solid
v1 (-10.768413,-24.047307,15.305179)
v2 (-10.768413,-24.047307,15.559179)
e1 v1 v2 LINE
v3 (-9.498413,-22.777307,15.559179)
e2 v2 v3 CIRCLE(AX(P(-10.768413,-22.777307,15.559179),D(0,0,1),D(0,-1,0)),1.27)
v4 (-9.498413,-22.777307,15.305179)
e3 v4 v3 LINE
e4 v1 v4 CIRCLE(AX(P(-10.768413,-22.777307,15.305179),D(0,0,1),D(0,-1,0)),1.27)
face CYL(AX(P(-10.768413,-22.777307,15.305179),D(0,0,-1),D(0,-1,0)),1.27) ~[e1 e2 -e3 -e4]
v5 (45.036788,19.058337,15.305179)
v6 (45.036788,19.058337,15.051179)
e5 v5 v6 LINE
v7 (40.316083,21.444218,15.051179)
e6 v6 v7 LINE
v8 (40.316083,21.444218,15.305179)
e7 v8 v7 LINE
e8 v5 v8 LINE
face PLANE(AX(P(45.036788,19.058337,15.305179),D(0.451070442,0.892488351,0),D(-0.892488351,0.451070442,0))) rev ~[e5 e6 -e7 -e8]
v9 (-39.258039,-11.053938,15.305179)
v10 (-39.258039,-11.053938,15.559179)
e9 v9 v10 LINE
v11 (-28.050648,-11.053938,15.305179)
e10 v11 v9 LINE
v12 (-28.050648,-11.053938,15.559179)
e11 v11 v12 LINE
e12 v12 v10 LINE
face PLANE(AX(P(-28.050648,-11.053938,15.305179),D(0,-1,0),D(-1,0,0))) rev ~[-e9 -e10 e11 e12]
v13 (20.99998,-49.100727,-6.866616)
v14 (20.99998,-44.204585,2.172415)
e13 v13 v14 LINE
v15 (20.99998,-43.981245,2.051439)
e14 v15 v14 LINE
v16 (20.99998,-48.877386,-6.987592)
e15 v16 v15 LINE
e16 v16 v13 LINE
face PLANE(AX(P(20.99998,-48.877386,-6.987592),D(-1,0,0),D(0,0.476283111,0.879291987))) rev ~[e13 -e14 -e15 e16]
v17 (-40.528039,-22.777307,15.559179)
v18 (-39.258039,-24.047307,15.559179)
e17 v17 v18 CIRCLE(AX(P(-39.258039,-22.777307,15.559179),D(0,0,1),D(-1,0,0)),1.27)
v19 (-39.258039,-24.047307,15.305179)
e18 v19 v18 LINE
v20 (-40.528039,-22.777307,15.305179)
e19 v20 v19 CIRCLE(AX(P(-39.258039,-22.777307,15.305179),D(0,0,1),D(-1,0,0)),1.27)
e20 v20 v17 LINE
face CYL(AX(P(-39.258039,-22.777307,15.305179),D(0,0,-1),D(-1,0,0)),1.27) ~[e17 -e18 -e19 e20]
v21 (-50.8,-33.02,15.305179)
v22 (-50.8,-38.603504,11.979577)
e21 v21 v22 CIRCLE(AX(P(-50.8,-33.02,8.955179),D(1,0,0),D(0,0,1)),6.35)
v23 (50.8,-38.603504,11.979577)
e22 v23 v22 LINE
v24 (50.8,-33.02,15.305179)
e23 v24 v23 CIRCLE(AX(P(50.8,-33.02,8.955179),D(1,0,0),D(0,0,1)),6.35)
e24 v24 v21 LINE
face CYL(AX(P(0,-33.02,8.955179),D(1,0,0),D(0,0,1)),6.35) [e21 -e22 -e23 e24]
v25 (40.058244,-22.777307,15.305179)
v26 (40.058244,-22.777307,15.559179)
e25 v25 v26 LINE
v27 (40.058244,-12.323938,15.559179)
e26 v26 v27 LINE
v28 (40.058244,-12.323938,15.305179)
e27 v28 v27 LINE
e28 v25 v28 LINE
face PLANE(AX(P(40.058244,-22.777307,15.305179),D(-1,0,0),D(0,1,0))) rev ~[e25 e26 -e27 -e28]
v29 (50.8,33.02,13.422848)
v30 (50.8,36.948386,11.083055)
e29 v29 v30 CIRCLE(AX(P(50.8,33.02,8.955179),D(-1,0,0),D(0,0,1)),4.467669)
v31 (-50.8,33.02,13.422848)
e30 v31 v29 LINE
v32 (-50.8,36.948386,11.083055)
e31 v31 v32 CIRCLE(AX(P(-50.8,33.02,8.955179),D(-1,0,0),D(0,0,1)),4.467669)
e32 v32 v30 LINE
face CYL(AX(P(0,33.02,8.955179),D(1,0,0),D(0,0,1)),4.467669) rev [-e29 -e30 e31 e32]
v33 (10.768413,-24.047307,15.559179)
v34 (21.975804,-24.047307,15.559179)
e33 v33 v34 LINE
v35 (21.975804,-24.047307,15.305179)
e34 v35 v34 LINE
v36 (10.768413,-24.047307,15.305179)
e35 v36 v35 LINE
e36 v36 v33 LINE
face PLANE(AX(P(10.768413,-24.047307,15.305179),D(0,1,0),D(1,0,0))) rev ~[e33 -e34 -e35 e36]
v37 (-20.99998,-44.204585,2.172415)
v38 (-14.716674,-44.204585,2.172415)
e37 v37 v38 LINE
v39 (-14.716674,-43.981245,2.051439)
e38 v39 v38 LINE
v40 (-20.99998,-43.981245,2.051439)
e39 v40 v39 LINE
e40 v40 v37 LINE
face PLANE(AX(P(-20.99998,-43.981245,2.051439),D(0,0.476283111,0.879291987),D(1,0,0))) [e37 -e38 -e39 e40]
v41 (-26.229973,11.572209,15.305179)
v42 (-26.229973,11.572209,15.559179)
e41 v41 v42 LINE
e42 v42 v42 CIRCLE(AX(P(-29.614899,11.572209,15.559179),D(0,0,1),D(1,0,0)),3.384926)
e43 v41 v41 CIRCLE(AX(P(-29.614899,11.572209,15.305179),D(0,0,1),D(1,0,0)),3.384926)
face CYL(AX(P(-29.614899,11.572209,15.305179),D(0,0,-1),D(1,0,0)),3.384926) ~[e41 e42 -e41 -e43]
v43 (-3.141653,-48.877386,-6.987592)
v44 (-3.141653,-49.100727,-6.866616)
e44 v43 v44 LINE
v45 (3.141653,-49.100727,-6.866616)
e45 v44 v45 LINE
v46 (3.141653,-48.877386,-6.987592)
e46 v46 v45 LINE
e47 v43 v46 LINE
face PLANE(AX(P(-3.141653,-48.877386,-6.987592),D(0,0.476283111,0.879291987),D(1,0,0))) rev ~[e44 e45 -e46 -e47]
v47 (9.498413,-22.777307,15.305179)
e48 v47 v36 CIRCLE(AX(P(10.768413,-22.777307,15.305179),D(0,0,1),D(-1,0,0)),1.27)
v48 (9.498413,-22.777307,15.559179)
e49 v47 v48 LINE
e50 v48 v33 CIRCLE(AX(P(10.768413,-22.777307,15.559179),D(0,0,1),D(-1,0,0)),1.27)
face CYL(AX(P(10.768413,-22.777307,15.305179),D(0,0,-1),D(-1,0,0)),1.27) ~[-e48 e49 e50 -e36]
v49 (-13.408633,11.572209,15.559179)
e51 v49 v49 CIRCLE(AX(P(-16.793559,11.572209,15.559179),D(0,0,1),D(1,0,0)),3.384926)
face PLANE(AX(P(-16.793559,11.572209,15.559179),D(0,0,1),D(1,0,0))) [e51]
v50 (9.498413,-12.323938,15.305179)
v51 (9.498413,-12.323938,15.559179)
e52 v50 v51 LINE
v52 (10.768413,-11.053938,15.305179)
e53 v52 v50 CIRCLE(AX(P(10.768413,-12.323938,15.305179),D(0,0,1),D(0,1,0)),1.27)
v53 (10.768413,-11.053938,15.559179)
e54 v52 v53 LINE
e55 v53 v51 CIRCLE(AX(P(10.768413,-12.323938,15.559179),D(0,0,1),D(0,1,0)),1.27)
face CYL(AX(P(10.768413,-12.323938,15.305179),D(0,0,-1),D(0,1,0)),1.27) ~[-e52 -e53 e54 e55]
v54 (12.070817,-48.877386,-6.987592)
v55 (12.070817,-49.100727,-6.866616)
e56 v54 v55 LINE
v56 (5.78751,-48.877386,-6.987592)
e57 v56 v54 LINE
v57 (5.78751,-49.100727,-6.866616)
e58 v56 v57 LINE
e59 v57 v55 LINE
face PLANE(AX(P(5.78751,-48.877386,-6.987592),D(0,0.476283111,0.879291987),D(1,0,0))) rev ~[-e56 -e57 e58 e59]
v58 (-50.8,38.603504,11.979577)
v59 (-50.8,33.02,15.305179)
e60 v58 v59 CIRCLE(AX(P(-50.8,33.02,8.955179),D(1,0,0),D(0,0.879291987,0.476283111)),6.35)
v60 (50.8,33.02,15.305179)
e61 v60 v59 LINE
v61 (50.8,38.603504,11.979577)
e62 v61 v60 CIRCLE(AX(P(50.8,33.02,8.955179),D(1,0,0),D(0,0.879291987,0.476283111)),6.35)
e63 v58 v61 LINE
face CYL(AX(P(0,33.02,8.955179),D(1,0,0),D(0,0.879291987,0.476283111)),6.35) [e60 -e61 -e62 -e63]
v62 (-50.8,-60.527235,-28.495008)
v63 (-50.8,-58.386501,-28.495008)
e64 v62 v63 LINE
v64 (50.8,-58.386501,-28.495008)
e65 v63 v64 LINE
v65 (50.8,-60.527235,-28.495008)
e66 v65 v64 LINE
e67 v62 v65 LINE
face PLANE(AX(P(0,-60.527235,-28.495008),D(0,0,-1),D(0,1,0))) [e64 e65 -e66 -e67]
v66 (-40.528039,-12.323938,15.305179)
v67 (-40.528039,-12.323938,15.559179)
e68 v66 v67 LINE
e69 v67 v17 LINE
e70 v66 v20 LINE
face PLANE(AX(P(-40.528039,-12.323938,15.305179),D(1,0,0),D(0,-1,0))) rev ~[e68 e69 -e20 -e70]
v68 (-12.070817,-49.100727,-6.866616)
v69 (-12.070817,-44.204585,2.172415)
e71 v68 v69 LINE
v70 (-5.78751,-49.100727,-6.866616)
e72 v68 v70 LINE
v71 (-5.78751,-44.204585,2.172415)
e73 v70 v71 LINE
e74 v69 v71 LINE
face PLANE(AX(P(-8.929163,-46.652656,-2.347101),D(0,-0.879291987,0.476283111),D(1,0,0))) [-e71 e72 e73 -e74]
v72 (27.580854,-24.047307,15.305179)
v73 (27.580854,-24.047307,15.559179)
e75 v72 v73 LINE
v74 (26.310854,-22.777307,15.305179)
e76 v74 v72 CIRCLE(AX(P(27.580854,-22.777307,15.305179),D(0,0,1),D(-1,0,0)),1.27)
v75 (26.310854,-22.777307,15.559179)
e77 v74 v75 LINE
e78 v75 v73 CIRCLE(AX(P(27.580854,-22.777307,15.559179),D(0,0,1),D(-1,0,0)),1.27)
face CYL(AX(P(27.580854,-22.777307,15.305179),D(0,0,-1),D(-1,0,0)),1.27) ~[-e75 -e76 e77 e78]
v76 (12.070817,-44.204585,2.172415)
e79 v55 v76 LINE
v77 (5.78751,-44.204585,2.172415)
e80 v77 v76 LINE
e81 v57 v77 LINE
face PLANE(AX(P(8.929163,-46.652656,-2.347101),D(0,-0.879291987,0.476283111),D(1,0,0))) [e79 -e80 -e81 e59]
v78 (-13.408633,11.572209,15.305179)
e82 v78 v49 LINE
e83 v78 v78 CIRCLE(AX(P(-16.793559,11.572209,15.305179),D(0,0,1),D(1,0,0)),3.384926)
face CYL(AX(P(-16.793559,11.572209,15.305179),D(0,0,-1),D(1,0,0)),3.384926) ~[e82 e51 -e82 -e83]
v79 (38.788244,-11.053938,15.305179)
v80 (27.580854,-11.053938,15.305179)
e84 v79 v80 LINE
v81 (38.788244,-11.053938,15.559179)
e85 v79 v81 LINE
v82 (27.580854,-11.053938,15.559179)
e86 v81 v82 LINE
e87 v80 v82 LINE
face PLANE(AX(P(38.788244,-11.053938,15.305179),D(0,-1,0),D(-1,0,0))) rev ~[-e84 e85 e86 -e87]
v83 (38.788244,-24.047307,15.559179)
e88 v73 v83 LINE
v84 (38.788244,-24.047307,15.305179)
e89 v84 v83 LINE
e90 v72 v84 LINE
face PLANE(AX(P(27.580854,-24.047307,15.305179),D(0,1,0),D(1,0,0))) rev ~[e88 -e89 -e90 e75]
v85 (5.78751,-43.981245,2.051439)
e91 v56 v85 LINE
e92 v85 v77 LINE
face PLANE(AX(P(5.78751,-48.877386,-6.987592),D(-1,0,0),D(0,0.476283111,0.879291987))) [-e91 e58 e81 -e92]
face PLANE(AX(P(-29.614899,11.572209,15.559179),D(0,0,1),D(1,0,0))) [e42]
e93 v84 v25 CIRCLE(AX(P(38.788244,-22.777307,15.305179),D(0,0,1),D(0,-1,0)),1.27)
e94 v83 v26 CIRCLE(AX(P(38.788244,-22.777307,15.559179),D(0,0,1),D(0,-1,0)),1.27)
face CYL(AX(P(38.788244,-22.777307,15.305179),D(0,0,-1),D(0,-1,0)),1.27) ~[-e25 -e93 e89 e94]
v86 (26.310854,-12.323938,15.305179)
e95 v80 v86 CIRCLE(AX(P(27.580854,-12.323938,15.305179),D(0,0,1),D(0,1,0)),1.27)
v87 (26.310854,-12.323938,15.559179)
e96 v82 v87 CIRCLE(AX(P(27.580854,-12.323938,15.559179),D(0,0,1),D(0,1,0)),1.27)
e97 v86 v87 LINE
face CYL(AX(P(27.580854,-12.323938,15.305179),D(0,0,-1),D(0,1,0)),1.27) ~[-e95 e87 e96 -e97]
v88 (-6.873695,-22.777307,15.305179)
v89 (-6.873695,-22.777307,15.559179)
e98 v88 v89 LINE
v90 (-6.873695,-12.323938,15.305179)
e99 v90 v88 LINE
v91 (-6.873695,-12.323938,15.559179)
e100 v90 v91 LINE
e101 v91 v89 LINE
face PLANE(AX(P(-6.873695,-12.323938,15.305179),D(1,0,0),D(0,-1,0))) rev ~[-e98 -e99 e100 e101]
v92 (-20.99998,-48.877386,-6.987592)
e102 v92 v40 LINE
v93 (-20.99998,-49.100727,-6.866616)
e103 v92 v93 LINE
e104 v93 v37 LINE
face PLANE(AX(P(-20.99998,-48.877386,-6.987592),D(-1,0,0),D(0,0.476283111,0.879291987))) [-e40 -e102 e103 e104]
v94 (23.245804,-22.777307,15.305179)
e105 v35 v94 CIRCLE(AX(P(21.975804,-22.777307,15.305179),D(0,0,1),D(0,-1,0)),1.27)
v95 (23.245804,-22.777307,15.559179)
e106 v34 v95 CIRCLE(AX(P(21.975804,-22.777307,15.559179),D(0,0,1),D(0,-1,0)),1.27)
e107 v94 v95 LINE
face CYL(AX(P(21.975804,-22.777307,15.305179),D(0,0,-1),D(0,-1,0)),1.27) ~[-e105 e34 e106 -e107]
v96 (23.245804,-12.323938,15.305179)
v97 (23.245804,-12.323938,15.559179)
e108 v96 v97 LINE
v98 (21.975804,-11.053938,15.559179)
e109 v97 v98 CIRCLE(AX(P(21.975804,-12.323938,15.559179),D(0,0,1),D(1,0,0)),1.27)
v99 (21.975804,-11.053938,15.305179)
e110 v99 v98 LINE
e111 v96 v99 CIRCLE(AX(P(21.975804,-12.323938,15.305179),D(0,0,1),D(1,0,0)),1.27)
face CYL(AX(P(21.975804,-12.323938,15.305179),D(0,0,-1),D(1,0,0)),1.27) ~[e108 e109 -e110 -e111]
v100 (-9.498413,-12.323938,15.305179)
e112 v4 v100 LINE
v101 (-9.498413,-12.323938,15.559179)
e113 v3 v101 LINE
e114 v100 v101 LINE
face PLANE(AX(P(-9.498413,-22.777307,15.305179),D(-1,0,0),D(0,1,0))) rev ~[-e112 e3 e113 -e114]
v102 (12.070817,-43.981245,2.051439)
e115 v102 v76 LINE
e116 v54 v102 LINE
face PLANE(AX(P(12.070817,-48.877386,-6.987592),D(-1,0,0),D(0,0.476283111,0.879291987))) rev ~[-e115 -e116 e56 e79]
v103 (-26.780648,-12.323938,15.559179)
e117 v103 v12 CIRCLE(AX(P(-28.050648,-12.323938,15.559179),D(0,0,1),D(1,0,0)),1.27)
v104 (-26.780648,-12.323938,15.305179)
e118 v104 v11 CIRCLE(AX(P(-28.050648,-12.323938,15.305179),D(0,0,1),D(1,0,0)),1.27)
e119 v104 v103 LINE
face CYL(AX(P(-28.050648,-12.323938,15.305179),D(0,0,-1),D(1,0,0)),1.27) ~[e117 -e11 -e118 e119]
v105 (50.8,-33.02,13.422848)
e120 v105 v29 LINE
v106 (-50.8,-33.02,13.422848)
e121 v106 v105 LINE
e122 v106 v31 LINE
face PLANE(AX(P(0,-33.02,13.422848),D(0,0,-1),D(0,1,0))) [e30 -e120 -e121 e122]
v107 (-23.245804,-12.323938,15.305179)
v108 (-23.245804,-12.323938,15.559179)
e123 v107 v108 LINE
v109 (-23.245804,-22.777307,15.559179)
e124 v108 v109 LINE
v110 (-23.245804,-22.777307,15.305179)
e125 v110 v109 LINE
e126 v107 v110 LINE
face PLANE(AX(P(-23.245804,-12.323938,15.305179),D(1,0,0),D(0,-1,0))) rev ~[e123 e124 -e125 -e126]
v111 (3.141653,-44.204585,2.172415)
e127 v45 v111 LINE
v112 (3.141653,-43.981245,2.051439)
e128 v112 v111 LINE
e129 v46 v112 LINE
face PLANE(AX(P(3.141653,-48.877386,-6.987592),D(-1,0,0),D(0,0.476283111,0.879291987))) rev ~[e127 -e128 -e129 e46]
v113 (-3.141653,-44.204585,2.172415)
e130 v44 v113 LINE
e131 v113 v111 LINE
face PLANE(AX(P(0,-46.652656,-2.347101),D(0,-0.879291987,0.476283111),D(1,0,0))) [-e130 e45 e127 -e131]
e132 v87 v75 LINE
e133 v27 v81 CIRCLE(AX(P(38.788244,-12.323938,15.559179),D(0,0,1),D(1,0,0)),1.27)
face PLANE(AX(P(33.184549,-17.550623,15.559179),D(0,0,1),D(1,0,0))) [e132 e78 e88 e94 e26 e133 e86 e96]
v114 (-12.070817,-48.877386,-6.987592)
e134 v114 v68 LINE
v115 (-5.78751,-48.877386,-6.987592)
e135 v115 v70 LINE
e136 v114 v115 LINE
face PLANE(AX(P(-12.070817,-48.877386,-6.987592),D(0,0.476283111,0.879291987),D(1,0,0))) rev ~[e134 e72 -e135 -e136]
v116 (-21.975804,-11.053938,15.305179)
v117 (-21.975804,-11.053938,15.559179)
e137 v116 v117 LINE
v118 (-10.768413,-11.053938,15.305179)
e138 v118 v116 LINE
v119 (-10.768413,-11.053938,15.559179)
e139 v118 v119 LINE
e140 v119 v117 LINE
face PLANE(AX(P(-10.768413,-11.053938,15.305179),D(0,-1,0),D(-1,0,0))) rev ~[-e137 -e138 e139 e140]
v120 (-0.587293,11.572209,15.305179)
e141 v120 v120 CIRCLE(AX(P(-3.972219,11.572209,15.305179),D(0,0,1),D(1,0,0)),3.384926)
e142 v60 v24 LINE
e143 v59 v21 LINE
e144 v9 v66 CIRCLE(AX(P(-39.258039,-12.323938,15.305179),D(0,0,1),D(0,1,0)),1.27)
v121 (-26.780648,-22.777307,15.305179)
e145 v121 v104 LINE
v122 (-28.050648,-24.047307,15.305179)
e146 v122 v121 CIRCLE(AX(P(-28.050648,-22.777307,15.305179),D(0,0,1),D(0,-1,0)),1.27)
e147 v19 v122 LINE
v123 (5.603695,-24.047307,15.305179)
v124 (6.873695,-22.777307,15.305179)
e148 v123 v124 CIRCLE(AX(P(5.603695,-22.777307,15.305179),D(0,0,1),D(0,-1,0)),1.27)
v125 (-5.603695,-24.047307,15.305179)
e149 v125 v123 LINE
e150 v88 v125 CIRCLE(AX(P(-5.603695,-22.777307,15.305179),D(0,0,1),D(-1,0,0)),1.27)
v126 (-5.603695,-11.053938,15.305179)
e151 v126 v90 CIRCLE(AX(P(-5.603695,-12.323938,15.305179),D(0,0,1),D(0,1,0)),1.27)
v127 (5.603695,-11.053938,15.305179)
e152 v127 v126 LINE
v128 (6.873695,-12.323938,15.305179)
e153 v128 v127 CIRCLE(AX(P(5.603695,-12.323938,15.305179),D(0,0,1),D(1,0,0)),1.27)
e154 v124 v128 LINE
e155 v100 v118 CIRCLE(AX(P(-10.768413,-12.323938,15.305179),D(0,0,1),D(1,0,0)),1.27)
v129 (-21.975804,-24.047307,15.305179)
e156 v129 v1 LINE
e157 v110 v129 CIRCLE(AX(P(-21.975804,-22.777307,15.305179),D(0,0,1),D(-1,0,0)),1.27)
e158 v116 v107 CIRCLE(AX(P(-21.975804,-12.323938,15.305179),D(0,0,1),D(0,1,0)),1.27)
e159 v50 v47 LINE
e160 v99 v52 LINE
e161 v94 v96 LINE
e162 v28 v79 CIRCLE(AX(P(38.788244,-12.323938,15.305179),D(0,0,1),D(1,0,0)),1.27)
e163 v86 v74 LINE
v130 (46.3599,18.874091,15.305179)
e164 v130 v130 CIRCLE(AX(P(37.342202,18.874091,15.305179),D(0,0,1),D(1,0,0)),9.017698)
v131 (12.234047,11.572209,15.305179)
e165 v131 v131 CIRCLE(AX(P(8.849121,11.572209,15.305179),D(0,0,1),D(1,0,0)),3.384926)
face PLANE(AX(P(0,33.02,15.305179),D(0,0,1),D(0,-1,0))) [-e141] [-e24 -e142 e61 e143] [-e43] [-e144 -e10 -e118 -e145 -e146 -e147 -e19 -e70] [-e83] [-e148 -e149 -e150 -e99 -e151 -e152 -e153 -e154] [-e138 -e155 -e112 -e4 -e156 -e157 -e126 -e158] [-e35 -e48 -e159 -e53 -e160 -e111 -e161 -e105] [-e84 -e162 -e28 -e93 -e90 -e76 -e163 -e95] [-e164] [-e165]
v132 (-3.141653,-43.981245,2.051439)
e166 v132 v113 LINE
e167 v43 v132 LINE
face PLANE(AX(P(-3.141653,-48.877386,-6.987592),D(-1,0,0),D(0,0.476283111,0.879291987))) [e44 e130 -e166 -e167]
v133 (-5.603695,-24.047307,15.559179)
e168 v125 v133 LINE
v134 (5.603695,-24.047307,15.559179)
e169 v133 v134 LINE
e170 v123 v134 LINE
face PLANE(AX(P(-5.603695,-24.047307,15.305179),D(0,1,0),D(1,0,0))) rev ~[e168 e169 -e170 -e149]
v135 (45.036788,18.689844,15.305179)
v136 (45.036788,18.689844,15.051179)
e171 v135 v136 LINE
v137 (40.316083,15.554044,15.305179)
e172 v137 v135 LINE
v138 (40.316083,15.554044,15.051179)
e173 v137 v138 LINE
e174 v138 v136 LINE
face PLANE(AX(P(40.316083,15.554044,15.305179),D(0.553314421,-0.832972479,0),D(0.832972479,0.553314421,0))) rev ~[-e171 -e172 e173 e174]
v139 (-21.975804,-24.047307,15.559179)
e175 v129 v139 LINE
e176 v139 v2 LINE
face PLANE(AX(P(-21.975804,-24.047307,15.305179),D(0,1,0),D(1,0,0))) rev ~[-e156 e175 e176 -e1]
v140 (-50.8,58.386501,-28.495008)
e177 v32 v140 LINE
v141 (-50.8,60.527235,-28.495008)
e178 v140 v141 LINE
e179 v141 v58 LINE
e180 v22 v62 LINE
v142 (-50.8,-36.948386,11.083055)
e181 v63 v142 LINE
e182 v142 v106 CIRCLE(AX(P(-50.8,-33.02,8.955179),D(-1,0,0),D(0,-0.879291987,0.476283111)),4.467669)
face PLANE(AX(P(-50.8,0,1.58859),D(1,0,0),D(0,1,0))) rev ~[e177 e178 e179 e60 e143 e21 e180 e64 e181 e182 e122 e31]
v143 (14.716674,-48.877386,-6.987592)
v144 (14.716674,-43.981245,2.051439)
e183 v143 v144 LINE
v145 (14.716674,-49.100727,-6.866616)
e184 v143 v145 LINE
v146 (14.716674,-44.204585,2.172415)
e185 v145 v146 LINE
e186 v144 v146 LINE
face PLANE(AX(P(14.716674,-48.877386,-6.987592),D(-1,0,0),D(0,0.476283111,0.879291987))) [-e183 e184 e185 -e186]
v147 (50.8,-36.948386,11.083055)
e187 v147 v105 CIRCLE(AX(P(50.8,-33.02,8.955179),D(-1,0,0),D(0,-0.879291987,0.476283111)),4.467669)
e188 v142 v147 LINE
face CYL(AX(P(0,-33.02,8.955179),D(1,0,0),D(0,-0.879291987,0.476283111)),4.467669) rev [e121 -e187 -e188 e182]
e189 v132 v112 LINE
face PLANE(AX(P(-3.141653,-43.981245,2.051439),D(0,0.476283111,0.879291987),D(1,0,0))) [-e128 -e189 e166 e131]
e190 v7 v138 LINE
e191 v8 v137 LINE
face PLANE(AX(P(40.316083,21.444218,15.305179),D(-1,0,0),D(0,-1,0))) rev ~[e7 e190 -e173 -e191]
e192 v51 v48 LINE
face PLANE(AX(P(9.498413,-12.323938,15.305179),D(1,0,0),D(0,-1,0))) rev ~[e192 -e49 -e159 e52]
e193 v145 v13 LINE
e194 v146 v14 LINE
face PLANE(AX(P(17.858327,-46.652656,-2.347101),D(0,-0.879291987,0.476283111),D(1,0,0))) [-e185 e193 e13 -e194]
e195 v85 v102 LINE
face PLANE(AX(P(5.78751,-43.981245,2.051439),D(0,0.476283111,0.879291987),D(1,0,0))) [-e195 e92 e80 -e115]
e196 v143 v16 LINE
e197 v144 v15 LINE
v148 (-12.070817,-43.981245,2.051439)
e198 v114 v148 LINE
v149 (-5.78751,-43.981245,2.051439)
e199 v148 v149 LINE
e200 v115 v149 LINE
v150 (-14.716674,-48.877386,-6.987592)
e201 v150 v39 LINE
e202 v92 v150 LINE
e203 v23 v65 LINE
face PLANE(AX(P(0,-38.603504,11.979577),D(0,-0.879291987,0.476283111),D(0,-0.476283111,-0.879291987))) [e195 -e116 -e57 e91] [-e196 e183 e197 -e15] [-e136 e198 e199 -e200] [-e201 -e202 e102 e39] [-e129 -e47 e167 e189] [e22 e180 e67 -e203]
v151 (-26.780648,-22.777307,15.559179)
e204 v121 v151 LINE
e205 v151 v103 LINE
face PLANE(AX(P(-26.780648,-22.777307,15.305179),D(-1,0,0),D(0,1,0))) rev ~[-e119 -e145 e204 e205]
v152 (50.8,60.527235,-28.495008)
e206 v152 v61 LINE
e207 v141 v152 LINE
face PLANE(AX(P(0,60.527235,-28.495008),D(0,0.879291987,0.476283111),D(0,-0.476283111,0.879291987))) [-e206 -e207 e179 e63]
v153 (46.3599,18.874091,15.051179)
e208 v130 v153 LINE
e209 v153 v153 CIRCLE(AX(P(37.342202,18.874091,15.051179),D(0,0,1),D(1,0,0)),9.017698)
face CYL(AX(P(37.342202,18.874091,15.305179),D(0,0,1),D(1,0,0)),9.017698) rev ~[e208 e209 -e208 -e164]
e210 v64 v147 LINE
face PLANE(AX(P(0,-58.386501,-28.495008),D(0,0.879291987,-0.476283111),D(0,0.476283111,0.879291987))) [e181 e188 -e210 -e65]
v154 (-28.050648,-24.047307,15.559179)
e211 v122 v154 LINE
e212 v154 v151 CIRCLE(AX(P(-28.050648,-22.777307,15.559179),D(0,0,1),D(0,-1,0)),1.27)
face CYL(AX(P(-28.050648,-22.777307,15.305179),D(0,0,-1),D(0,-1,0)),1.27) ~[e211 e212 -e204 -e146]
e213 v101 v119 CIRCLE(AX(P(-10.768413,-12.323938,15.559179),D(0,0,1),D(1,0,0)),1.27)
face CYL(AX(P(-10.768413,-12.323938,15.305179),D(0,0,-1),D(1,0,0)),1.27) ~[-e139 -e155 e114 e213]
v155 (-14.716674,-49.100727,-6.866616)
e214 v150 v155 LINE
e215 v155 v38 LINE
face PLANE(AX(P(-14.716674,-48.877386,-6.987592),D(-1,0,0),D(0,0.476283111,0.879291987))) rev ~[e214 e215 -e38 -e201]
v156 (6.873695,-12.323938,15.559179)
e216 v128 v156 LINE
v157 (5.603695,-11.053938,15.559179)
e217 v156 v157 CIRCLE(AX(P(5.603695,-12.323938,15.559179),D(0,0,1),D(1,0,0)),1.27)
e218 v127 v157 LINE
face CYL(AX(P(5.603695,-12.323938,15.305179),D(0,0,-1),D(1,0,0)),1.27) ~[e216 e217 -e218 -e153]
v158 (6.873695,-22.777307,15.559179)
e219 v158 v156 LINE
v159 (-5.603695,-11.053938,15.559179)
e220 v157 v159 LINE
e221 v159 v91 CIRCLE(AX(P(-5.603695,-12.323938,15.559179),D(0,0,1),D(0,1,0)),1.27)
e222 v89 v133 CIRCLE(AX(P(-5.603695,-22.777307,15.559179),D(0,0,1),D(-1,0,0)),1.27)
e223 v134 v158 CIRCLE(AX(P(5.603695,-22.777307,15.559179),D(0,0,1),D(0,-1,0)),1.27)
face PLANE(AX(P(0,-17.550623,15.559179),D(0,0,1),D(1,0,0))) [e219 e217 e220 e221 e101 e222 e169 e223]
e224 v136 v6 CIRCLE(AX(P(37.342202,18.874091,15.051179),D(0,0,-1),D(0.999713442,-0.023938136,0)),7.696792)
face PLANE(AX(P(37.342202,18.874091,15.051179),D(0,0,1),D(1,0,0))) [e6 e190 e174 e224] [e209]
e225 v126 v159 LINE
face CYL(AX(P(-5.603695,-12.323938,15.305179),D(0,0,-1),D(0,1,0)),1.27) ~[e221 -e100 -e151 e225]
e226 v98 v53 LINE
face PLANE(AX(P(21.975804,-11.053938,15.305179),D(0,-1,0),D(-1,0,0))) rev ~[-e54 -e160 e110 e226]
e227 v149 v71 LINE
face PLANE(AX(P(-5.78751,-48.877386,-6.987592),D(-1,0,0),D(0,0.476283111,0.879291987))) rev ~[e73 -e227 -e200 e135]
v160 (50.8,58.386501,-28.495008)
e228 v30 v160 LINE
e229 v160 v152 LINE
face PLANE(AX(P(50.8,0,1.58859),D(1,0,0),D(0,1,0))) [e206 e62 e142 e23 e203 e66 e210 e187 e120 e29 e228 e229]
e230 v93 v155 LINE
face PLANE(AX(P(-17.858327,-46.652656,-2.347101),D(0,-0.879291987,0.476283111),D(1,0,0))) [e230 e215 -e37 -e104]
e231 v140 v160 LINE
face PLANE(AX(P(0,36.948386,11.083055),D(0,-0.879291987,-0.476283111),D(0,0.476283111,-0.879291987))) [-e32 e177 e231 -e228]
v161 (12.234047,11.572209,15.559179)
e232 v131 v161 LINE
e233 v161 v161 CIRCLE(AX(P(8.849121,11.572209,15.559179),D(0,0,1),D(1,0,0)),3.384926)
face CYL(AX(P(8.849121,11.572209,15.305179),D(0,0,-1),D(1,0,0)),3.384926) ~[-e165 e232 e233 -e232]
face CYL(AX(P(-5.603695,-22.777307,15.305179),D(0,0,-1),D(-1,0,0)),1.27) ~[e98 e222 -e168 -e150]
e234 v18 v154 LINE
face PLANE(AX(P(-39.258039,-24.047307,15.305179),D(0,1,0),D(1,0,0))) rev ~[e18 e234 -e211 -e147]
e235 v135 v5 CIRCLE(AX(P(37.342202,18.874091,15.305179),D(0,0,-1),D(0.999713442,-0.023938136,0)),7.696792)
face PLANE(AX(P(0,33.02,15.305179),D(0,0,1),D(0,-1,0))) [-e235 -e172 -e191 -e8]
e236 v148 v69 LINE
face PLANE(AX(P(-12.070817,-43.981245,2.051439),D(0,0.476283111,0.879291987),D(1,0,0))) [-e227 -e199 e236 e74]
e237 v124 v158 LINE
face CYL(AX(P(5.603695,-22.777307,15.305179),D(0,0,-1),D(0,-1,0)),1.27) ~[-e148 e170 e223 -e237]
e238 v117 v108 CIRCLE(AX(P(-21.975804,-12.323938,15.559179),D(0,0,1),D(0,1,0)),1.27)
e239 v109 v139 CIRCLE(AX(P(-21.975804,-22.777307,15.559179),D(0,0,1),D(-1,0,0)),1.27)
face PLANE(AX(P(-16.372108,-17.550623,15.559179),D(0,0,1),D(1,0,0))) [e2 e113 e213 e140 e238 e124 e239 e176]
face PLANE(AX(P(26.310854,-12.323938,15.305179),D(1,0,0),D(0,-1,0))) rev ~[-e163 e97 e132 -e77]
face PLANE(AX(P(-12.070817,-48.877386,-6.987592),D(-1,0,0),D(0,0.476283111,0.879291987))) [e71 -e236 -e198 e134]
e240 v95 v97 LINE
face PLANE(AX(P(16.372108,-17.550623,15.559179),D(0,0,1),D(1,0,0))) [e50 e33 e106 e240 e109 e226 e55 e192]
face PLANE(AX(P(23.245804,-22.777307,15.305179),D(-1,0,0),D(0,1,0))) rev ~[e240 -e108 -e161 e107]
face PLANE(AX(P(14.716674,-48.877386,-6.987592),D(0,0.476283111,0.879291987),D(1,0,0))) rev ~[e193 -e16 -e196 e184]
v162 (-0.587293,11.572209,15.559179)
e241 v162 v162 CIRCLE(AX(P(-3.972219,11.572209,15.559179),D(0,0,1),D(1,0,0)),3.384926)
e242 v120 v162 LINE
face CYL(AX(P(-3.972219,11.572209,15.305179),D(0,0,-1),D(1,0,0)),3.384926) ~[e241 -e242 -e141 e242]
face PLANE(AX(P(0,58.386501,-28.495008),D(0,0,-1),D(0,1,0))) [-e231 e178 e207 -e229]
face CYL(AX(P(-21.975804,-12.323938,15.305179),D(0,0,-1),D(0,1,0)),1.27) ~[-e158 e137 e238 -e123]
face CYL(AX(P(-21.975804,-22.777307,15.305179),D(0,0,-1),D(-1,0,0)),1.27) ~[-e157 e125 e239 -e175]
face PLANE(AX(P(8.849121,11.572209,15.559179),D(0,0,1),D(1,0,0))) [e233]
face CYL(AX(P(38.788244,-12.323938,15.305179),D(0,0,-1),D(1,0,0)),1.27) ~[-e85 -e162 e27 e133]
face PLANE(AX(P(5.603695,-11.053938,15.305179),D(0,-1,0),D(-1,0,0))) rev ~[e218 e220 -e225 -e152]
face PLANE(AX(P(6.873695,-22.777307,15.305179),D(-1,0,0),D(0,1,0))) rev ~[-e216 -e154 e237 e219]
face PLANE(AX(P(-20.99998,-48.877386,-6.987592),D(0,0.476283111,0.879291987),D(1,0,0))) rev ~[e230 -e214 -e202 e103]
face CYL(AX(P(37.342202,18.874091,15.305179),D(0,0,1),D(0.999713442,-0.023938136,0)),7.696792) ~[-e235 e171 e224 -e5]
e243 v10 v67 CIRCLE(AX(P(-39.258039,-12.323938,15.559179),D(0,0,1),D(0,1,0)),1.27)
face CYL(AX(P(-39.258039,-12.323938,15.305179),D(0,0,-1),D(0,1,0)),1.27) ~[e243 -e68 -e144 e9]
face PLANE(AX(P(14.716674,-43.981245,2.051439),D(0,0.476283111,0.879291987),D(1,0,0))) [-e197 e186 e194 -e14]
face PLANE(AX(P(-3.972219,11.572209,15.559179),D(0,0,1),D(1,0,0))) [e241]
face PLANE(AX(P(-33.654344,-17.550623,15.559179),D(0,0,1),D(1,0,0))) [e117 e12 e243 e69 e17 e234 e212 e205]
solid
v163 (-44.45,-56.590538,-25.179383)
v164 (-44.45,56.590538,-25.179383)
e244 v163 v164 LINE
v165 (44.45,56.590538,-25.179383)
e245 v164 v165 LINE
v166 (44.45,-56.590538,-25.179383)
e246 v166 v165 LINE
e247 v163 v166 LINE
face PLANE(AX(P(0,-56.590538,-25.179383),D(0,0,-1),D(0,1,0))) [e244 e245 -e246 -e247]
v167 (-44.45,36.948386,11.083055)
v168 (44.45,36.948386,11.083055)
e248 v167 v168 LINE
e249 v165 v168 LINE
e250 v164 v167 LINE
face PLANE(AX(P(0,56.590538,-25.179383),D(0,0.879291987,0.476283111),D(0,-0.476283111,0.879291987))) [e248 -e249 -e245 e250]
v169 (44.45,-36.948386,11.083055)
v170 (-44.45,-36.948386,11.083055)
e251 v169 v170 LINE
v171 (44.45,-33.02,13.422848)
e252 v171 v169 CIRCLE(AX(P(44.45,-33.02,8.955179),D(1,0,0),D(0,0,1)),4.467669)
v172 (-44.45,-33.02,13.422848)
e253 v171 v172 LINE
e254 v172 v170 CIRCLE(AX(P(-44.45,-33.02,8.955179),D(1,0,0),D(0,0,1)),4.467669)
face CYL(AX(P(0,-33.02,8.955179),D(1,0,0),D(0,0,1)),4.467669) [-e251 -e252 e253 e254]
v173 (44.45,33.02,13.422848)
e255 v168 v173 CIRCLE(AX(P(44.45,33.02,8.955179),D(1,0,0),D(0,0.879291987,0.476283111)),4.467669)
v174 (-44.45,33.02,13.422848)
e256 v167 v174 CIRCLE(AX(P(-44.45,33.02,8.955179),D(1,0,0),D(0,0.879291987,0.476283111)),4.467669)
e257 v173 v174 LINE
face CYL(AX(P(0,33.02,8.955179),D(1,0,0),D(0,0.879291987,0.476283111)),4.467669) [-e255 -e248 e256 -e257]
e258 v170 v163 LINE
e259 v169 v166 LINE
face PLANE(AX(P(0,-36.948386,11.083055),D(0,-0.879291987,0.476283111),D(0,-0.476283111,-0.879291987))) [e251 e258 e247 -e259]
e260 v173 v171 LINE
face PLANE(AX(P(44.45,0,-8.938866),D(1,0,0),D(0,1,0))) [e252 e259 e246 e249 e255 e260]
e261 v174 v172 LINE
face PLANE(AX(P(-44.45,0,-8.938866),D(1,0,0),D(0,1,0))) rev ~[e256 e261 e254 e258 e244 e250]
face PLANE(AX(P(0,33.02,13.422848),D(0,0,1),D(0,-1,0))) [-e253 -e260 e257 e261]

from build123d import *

# Parameters (mm, degrees)
F2_DEPTH  = 50.8
F4_W      = 6.283306625
F4_H      = 10.2798976004
F5_DEPTH  = 0.254
F7_DEPTH  = 0.254
F9_DEPTH  = 44.45
F10_R     = 3.3849263003
F11_DEPTH = 0.254
F12_R     = 9.0176977482
F13_DEPTH = 0.254


# Not quite as in the source:
# - a feature names something its author has since deleted; it is built from what else it names
# - the program builds the solid bodies; features that only make, move or delete a surface that nothing else refers to are left out


with BuildPart() as f2:
    # F1 (on Right) → F2 (new body, symmetric)
    with BuildSketch(Plane.YZ):
        with BuildLine():
            Line((-38.6035041166, 11.9795769261), (-60.5272354513, -28.4950081259))
            Line((-60.5272354513, -28.4950081259), (-58.3865008404, -28.4950081259))
            Line((-58.3865008404, -28.4950081259), (-36.9483857369, 11.0830545618))
            ThreePointArc((-36.9483857369, 11.0830545618), (-35.3062004297, 12.7935845395), (-33.02, 13.4228483819))
            Line((-33.02, 13.4228483819), (-7.4128283233, 13.4228483819))
            Line((-7.4128283233, 13.4228483819), (7.4128283233, 13.4228483819))
            Line((7.4128283233, 13.4228483819), (33.02, 13.4228483819))
            ThreePointArc((33.02, 13.4228483819), (35.3062004297, 12.7935845395), (36.9483857369, 11.0830545618))
            Line((36.9483857369, 11.0830545618), (58.3865008404, -28.4950081259))
            Line((58.3865008404, -28.4950081259), (60.5272354513, -28.4950081259))
            Line((60.5272354513, -28.4950081259), (38.6035041166, 11.9795769261))
            ThreePointArc((38.6035041166, 11.9795769261), (36.2694287388, 14.4107921406), (33.02, 15.3051791713))
            Line((33.02, 15.3051791713), (0, 15.3051791713))
            Line((0, 15.3051791713), (-33.02, 15.3051791713))
            ThreePointArc((-33.02, 15.3051791713), (-36.2694287388, 14.4107921406), (-38.6035041166, 11.9795769261))
        make_face()
    extrude(amount=F2_DEPTH, both=True)

    # F4 (on face) → F5 (join)
    with BuildSketch(Plane(origin=(0, -34.8634190503, 18.8843500603), x_dir=(1, 0, 0), z_dir=(0, -0.8792919869, 0.476283111))):
        with Locations((-17.8583269549, -24.2836587131)):
            Rectangle(F4_W, F4_H)
        with Locations((-8.9291634774, -24.2836587131)):
            Rectangle(F4_W, F4_H)
        with Locations((0, -24.2836587131)):
            Rectangle(F4_W, F4_H)
        with Locations((8.9291634774, -24.2836587131)):
            Rectangle(F4_W, F4_H)
        with Locations((17.8583269549, -24.2836587131)):
            Rectangle(F4_W, F4_H)
    extrude(amount=F5_DEPTH)

    # F6 (on face) → F7 (join)
    with BuildSketch(Plane.XY.offset(15.3051791713)):
        with BuildLine():
            Line((-28.0506481811, -11.053937773), (-39.258038976, -11.053937773))
            ThreePointArc((-39.258038976, -11.053937773), (-40.1560645881, -11.4259121609), (-40.528038976, -12.323937773))
            Line((-40.528038976, -12.323937773), (-40.528038976, -22.7773072362))
            ThreePointArc((-40.528038976, -22.7773072362), (-40.1560645881, -23.6753328483), (-39.258038976, -24.0473072362))
            Line((-39.258038976, -24.0473072362), (-28.0506481811, -24.0473072362))
            ThreePointArc((-28.0506481811, -24.0473072362), (-27.152622569, -23.6753328483), (-26.7806481811, -22.7773072362))
            Line((-26.7806481811, -22.7773072362), (-26.7806481811, -12.323937773))
            ThreePointArc((-26.7806481811, -12.323937773), (-27.152622569, -11.4259121609), (-28.0506481811, -11.053937773))
        make_face()
        with BuildLine():
            Line((-10.7684130521, -11.053937773), (-21.9758038469, -11.053937773))
            ThreePointArc((-21.9758038469, -11.053937773), (-22.873829459, -11.4259121609), (-23.2458038469, -12.323937773))
            Line((-23.2458038469, -12.323937773), (-23.2458038469, -22.7773072362))
            ThreePointArc((-23.2458038469, -22.7773072362), (-22.873829459, -23.6753328483), (-21.9758038469, -24.0473072362))
            Line((-21.9758038469, -24.0473072362), (-10.7684130521, -24.0473072362))
            ThreePointArc((-10.7684130521, -24.0473072362), (-9.87038744, -23.6753328483), (-9.4984130521, -22.7773072362))
            Line((-9.4984130521, -22.7773072362), (-9.4984130521, -12.323937773))
            ThreePointArc((-9.4984130521, -12.323937773), (-9.87038744, -11.4259121609), (-10.7684130521, -11.053937773))
        make_face()
        with BuildLine():
            Line((5.6036953974, -11.053937773), (-5.6036953974, -11.053937773))
            ThreePointArc((-5.6036953974, -11.053937773), (-6.5017210095, -11.4259121609), (-6.8736953974, -12.323937773))
            Line((-6.8736953974, -12.323937773), (-6.8736953974, -22.7773072362))
            ThreePointArc((-6.8736953974, -22.7773072362), (-6.5017210095, -23.6753328483), (-5.6036953974, -24.0473072362))
            Line((-5.6036953974, -24.0473072362), (5.6036953974, -24.0473072362))
            ThreePointArc((5.6036953974, -24.0473072362), (6.5017210095, -23.6753328483), (6.8736953974, -22.7773072362))
            Line((6.8736953974, -22.7773072362), (6.8736953974, -12.323937773))
            ThreePointArc((6.8736953974, -12.323937773), (6.5017210095, -11.4259121609), (5.6036953974, -11.053937773))
        make_face()
        with BuildLine():
            Line((21.9758038469, -11.053937773), (10.7684130521, -11.053937773))
            ThreePointArc((10.7684130521, -11.053937773), (9.87038744, -11.4259121609), (9.4984130521, -12.323937773))
            Line((9.4984130521, -12.323937773), (9.4984130521, -22.7773072362))
            ThreePointArc((9.4984130521, -22.7773072362), (9.87038744, -23.6753328483), (10.7684130521, -24.0473072362))
            Line((10.7684130521, -24.0473072362), (21.9758038469, -24.0473072362))
            ThreePointArc((21.9758038469, -24.0473072362), (22.873829459, -23.6753328483), (23.2458038469, -22.7773072362))
            Line((23.2458038469, -22.7773072362), (23.2458038469, -12.323937773))
            ThreePointArc((23.2458038469, -12.323937773), (22.873829459, -11.4259121609), (21.9758038469, -11.053937773))
        make_face()
        with BuildLine():
            Line((38.7882444791, -11.053937773), (27.5808536842, -11.053937773))
            ThreePointArc((27.5808536842, -11.053937773), (26.6828280721, -11.4259121609), (26.3108536842, -12.323937773))
            Line((26.3108536842, -12.323937773), (26.3108536842, -22.7773072362))
            ThreePointArc((26.3108536842, -22.7773072362), (26.6828280721, -23.6753328483), (27.5808536842, -24.0473072362))
            Line((27.5808536842, -24.0473072362), (38.7882444791, -24.0473072362))
            ThreePointArc((38.7882444791, -24.0473072362), (39.6862700912, -23.6753328483), (40.0582444791, -22.7773072362))
            Line((40.0582444791, -22.7773072362), (40.0582444791, -12.323937773))
            ThreePointArc((40.0582444791, -12.323937773), (39.6862700912, -11.4259121609), (38.7882444791, -11.053937773))
        make_face()
    extrude(amount=F7_DEPTH)

    # F10 (on face) → F11 (join)
    with BuildSketch(Plane.XY.offset(15.3051791713)):
        with Locations((-29.6148993075, 11.5722091869)):
            Circle(F10_R)
        with Locations((-16.793559286, 11.5722091869)):
            Circle(F10_R)
        with Locations((-3.9722192645, 11.5722091869)):
            Circle(F10_R)
        with Locations((8.849120757, 11.5722091869)):
            Circle(F10_R)
    extrude(amount=F11_DEPTH)

    # F12 (on face) → F13 (cut)
    with BuildSketch(Plane.XY.offset(15.3051791713)):
        with Locations((37.3422021844, 18.8740905886)):
            Circle(F12_R)
        with BuildLine():
            ThreePointArc((45.0367882661, 19.0583374351), (45.0384424307, 18.9662206123), (45.0389938452, 18.8740905886))
            ThreePointArc((45.0389938452, 18.8740905886), (45.0384424307, 18.781960565), (45.0367882661, 18.6898437421))
            ThreePointArc((45.0367882661, 18.6898437421), (29.6454105237, 18.8740905886), (45.0367882661, 19.0583374351))
        make_face(mode=Mode.SUBTRACT)
        with BuildLine():
            ThreePointArc((45.0367882661, 18.6898437421), (45.0384424307, 18.781960565), (45.0389938452, 18.8740905886))
            ThreePointArc((45.0389938452, 18.8740905886), (45.0384424307, 18.9662206123), (45.0367882661, 19.0583374351))
            Line((45.0367882661, 19.0583374351), (40.3160825372, 21.4442182332))
            Line((40.3160825372, 21.4442182332), (40.3160825372, 15.5540443957))
            Line((40.3160825372, 15.5540443957), (45.0367882661, 18.6898437421))
        make_face()
    extrude(amount=-F13_DEPTH, mode=Mode.SUBTRACT)


with BuildPart() as f9:
    # F8 (on Right) → F9 (new body, symmetric)
    with BuildSketch(Plane.YZ):
        with BuildLine():
            Line((-36.9483857369, 11.0830545618), (-56.5905375594, -25.1793832691))
            Line((-56.5905375594, -25.1793832691), (56.5905375594, -25.1793832691))
            Line((56.5905375594, -25.1793832691), (36.9483857369, 11.0830545618))
            ThreePointArc((36.9483857369, 11.0830545618), (35.3062004297, 12.7935845395), (33.02, 13.4228483819))
            Line((33.02, 13.4228483819), (-33.02, 13.4228483819))
            ThreePointArc((-33.02, 13.4228483819), (-35.3062004297, 12.7935845395), (-36.9483857369, 11.0830545618))
        make_face()
    extrude(amount=F9_DEPTH, both=True)


solid = Compound([f2.part, f9.part])
